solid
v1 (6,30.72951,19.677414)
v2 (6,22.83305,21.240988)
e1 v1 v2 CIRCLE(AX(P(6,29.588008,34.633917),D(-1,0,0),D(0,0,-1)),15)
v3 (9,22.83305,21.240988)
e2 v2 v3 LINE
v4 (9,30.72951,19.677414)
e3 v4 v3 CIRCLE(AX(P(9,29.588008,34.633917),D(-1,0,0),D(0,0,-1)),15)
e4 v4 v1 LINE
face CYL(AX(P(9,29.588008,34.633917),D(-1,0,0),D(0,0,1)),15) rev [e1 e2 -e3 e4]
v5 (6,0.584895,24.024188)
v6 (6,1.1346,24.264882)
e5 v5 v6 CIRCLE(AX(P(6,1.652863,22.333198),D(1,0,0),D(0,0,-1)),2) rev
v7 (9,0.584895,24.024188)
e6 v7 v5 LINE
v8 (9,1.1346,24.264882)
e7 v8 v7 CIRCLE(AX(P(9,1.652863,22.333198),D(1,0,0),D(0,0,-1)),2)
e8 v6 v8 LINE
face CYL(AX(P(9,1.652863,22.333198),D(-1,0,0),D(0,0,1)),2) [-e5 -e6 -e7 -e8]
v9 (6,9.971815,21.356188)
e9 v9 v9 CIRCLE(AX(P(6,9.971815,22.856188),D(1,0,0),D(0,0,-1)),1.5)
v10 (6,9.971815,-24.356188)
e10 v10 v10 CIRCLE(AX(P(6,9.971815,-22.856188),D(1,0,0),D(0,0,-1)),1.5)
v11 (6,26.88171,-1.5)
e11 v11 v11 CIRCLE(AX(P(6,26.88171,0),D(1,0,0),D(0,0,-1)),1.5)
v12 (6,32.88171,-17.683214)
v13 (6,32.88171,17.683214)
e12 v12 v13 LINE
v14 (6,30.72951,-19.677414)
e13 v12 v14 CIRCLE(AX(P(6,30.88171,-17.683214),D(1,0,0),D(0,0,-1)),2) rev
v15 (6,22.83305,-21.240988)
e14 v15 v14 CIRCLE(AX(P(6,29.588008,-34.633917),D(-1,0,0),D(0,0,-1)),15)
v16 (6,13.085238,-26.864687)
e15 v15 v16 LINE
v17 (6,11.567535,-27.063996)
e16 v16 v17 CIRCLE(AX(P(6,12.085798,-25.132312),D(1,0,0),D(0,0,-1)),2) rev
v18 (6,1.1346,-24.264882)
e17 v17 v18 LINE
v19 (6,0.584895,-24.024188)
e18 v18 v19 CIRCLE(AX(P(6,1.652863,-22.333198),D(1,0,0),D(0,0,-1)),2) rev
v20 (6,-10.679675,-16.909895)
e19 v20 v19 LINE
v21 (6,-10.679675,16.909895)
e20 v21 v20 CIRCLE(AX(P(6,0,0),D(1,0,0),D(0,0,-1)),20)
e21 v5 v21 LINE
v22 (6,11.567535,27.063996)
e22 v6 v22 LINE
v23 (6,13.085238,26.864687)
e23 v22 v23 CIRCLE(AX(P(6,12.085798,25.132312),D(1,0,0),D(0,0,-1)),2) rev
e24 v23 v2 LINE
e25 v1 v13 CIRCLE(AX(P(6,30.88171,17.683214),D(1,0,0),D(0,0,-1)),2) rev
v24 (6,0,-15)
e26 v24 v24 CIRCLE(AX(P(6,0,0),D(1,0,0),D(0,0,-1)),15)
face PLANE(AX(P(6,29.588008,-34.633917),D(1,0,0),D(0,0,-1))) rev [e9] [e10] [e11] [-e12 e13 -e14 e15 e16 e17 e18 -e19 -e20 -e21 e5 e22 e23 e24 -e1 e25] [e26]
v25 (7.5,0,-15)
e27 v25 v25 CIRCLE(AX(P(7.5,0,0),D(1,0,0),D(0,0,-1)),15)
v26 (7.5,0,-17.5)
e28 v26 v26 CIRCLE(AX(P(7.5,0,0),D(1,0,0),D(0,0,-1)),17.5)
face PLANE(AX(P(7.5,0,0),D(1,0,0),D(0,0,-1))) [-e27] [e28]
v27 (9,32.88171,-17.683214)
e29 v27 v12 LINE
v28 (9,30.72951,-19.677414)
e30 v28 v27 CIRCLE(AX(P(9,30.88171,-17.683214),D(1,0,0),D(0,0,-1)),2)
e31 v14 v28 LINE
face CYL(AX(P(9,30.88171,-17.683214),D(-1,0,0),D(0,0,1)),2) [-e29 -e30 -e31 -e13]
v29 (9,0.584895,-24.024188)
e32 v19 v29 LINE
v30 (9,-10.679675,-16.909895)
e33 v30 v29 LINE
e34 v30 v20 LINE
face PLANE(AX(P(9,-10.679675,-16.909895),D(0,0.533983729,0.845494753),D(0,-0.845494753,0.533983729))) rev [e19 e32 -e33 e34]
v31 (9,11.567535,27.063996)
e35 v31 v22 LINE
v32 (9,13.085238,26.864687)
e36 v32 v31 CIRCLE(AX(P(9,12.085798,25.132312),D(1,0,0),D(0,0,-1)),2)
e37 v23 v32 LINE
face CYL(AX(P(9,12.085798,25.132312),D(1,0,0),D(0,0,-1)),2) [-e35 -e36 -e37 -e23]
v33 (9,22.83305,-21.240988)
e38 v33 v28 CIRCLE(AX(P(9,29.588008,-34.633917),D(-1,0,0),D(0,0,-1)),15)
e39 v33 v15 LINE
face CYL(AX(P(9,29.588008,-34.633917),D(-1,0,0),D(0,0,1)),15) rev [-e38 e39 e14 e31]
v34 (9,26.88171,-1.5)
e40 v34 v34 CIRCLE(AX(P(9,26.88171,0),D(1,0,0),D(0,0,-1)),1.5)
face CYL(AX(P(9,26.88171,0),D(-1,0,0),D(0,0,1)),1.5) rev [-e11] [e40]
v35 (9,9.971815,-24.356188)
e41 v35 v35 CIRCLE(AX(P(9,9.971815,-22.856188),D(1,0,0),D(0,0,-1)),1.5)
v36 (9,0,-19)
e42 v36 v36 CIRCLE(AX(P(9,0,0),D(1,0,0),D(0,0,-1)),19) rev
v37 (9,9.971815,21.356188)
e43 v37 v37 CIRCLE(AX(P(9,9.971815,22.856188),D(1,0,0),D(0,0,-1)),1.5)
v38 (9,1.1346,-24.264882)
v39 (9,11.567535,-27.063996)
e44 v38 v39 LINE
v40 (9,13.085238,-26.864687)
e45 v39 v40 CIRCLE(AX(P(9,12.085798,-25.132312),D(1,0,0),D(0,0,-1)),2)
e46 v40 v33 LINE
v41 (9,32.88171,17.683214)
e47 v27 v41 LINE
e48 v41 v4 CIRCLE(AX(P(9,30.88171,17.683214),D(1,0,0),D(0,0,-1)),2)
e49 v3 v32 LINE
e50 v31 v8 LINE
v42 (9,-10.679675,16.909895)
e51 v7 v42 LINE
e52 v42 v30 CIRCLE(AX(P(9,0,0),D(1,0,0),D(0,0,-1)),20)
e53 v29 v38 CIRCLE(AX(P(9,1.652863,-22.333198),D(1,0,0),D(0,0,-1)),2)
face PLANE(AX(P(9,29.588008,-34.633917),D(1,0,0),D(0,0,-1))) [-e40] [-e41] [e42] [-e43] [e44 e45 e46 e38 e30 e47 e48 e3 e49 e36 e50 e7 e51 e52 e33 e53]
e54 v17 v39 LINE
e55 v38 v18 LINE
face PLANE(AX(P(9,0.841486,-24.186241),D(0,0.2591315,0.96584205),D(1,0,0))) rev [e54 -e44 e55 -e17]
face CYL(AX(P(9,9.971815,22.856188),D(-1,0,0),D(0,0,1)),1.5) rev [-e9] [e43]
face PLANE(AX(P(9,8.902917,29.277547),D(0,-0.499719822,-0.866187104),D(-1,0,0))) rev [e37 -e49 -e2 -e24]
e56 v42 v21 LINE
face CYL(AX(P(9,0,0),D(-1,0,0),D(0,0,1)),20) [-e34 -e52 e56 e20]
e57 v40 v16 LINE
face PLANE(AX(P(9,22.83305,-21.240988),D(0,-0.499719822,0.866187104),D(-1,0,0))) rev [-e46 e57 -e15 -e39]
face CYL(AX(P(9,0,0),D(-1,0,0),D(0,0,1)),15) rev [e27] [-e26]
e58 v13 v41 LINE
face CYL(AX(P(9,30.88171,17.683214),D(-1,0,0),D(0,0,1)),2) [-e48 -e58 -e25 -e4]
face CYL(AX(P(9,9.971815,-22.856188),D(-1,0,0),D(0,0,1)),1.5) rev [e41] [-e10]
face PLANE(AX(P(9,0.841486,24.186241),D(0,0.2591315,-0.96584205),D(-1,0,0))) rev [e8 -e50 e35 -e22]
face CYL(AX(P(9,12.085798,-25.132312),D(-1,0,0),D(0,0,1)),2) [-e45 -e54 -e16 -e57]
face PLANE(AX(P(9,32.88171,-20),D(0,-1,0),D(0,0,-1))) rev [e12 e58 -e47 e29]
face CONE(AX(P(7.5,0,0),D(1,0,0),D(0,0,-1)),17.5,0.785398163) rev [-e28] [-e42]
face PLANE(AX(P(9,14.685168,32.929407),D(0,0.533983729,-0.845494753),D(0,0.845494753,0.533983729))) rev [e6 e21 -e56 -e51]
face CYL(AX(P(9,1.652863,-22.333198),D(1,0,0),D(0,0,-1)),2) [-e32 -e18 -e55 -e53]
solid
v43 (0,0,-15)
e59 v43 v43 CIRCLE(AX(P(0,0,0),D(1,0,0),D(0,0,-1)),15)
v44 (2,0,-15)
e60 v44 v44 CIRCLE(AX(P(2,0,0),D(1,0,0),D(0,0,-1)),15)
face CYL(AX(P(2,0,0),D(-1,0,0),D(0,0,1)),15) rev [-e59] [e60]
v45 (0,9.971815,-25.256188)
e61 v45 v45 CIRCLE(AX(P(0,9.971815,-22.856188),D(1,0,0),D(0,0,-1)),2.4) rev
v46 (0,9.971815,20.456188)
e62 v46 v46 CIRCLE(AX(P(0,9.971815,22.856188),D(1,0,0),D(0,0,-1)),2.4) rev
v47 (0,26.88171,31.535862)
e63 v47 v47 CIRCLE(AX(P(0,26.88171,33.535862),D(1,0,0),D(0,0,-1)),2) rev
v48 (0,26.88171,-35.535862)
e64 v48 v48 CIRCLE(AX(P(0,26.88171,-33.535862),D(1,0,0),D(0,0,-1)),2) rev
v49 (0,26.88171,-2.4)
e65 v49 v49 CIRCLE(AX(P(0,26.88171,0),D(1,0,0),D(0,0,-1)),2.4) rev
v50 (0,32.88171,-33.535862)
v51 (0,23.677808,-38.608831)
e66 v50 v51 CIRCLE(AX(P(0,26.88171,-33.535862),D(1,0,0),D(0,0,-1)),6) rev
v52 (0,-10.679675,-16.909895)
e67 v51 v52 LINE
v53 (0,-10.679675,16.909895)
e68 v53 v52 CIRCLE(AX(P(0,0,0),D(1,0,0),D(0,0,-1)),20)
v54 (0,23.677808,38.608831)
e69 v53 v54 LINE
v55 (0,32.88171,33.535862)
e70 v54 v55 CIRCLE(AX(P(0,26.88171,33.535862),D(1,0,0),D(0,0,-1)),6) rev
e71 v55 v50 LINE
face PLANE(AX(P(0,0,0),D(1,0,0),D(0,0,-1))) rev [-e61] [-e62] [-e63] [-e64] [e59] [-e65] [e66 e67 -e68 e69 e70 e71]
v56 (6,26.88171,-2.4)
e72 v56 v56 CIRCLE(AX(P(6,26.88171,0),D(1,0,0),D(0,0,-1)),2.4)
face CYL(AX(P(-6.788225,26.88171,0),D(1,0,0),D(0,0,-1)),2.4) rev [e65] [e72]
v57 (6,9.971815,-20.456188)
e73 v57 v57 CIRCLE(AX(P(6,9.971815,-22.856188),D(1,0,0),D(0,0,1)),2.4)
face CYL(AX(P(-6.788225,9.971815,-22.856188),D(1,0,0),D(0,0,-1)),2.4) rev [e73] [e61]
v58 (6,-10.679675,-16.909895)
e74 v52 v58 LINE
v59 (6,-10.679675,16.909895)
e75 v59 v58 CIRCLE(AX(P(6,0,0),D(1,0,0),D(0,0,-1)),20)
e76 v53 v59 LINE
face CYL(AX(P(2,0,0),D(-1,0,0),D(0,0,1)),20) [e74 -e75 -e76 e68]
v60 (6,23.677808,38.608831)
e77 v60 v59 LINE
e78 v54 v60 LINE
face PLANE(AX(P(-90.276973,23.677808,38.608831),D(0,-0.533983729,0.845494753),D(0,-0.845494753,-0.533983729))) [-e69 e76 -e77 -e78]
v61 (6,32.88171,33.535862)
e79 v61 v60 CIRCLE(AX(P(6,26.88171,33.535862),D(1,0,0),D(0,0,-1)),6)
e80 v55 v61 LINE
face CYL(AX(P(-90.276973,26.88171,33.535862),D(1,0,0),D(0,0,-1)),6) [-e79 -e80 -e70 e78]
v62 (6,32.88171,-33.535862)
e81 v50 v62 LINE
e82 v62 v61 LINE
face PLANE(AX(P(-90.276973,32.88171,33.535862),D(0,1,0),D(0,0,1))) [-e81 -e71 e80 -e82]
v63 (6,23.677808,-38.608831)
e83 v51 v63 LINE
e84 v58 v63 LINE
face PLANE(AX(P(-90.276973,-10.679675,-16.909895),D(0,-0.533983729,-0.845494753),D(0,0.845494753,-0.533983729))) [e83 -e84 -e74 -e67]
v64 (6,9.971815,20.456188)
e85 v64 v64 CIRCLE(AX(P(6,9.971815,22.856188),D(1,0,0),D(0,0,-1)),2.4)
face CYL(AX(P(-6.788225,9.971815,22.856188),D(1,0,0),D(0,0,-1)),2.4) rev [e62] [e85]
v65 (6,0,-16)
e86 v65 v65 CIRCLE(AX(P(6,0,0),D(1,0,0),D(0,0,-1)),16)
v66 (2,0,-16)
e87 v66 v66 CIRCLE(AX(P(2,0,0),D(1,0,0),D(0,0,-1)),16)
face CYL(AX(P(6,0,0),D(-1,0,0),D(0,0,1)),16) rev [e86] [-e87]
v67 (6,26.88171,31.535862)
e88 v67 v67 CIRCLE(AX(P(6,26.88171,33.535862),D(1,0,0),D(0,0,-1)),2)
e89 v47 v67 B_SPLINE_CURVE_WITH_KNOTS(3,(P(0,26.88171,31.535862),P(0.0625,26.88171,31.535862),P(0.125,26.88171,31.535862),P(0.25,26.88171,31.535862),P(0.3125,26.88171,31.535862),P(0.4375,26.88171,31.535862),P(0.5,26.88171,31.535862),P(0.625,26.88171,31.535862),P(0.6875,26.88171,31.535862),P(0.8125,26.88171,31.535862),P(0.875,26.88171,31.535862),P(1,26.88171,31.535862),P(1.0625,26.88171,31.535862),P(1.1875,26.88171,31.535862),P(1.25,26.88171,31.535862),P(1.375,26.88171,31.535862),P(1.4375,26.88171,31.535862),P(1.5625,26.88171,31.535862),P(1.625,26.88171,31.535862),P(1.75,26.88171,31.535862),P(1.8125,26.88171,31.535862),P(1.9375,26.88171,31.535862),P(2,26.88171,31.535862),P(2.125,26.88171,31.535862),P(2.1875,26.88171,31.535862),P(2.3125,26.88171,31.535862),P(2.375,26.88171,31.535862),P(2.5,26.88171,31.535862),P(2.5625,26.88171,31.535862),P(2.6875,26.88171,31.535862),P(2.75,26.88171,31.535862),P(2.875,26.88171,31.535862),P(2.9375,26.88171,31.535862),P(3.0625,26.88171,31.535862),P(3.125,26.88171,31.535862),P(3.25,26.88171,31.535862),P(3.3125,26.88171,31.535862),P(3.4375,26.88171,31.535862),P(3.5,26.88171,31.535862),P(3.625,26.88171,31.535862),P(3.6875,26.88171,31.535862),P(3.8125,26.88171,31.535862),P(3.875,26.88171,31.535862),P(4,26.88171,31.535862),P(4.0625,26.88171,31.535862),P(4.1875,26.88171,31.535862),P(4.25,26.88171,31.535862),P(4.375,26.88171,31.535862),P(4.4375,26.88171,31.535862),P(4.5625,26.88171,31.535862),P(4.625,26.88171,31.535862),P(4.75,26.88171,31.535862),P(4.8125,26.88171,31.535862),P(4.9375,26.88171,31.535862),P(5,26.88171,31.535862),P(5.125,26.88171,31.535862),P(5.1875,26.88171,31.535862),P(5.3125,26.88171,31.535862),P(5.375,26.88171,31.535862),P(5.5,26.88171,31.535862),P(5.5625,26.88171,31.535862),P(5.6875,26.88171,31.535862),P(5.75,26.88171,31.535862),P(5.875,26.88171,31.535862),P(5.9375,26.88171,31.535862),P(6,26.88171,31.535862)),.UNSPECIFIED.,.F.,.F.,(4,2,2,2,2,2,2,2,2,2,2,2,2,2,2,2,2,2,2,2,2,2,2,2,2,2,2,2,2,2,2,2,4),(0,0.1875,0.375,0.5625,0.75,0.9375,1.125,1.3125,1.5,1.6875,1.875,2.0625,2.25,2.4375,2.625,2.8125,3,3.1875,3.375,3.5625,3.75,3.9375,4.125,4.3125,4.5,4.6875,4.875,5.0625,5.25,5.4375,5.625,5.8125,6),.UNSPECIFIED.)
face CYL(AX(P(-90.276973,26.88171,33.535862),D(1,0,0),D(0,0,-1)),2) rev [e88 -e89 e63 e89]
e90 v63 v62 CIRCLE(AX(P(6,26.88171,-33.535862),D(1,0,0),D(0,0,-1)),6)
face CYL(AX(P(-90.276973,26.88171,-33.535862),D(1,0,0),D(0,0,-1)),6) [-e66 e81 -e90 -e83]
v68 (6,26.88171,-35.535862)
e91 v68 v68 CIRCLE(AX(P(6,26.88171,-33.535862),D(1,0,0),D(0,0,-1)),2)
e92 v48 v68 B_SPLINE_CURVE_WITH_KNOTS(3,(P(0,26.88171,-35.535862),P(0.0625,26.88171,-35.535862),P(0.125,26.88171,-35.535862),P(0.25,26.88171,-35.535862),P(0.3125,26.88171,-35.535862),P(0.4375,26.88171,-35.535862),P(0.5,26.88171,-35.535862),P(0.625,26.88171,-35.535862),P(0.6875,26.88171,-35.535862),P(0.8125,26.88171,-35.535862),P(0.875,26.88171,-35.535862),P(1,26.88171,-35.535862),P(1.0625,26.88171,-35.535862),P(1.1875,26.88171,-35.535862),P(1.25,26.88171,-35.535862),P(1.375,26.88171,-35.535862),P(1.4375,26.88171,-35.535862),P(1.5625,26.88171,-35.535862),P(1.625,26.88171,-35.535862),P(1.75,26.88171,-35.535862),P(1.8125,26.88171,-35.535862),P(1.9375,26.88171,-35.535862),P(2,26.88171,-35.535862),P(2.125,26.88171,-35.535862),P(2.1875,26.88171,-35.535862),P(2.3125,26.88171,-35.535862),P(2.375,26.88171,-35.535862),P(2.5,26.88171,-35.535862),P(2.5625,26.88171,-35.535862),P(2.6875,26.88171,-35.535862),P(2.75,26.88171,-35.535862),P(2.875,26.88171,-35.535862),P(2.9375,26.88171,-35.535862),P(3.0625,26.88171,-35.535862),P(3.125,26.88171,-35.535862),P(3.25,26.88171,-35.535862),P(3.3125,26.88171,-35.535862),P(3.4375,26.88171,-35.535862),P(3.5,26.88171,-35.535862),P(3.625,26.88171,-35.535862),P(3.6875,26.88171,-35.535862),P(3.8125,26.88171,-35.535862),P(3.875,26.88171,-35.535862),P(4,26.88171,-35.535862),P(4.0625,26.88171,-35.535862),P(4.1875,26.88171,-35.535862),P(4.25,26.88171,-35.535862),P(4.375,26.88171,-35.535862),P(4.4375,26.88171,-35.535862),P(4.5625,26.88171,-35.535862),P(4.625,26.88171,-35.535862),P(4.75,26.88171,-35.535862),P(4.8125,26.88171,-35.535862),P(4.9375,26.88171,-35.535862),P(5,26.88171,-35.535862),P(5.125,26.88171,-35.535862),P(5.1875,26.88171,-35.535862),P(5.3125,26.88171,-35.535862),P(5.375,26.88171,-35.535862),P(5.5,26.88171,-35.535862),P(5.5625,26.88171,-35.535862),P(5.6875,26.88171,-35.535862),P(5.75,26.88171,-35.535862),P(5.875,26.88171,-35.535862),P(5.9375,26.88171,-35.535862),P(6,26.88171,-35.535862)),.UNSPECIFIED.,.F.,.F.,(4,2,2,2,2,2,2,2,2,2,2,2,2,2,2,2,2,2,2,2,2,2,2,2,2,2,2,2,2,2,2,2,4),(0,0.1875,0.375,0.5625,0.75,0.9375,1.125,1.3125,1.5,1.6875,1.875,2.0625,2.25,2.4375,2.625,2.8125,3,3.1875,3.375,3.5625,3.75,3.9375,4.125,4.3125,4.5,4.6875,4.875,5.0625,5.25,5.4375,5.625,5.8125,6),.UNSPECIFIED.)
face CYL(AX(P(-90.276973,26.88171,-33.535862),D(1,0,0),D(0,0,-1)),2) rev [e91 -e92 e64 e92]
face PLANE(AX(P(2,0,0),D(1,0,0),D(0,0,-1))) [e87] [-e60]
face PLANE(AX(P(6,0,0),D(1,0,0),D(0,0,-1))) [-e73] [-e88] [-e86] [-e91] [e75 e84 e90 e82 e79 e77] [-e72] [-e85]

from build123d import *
from OCP.BRepFilletAPI import BRepFilletAPI_MakeChamfer

# Parameters (mm, degrees)
SKETCH1_R           = 20
SKETCH1_R_2         = 15
BOSS_EXTRUDE1_DEPTH = 2
SKETCH2_R           = 20
SKETCH2_R_2         = 16
BOSS_EXTRUDE2_DEPTH = 4
BOSS_EXTRUDE3_START = -6
SKETCH3_R           = 2
BOSS_EXTRUDE3_DEPTH = 6
SKETCH4_R           = 2.4
CUT_EXTRUDE1_DEPTH  = 6
SKETCH5_R           = 15
SKETCH5_R_2         = 1.5
BOSS_EXTRUDE4_DEPTH = 3
FILLET1_R           = 2
CUT_EXTRUDE2_START  = -1.5
SKETCH6_R           = 17.5
SKETCH6_R_2         = 15
CUT_EXTRUDE2_DEPTH  = 1.5
CHAMFER1_SIZE       = 1.5
CHAMFER2_START      = 6
CHAMFER2_DEPTH      = 3
CHAMFER2_2_DEPTH    = 3
CHAMFER3_SIZE       = 4
CHAMFER3_SIZE2      = 9.534572009
FILLET2_R           = 2


with BuildPart() as part:
    # Sketch1 → Boss-Extrude1 (new body)
    with BuildSketch(Plane(origin=(0, 0, 0), x_dir=(0, 0, -1), z_dir=(1, 0, 0))):
        Circle(SKETCH1_R)
        Circle(SKETCH1_R_2, mode=Mode.SUBTRACT)
    extrude(amount=BOSS_EXTRUDE1_DEPTH)

    # Sketch2 → Boss-Extrude2 (add)
    with BuildSketch(Plane(origin=(2, 0, 0), x_dir=(0, 0, -1), z_dir=(1, 0, 0))):
        Circle(SKETCH2_R)
        Circle(SKETCH2_R_2, mode=Mode.SUBTRACT)
    extrude(amount=BOSS_EXTRUDE2_DEPTH)

    # Sketch3 → Boss-Extrude3 (add)
    with BuildSketch(Plane(origin=(6, 0, 0), x_dir=(0, 0, -1), z_dir=(1, 0, 0)).offset(BOSS_EXTRUDE3_START)):
        with BuildLine():
            Line((-38.608830959, 23.677807584), (-16.909895057, -10.679674581))
            ThreePointArc((-16.909895057, -10.679674581), (0, 20), (16.909895057, -10.679674581))
            Line((16.909895057, -10.679674581), (38.608830959, 23.677807584))
            ThreePointArc((38.608830959, 23.677807584), (38.790546744, 29.777964933), (33.535862442, 32.881709959))
            Line((33.535862442, 32.881709959), (-33.535862442, 32.881709959))
            ThreePointArc((-33.535862442, 32.881709959), (-38.790546744, 29.777964933), (-38.608830959, 23.677807584))
        make_face()
        with Locations((-33.535862442, 26.881709959)):
            Circle(SKETCH3_R, mode=Mode.SUBTRACT)
        with Locations((33.535862442, 26.881709959)):
            Circle(SKETCH3_R, mode=Mode.SUBTRACT)
    extrude(amount=BOSS_EXTRUDE3_DEPTH)

    # Sketch4 → Cut-Extrude1 (cut)
    with BuildSketch(Plane(origin=(6, 0, 0), x_dir=(0, 0, -1), z_dir=(1, 0, 0))):
        with Locations((-22.856187861, 9.971814902)):
            Circle(SKETCH4_R)
        with Locations((22.856187861, 9.971814902)):
            Circle(SKETCH4_R)
        with Locations((0, 26.881709959)):
            Circle(SKETCH4_R)
    extrude(amount=-CUT_EXTRUDE1_DEPTH, mode=Mode.SUBTRACT)


with BuildPart() as body_2:
    # Sketch5 → Boss-Extrude4 (new body)
    with BuildSketch(Plane(origin=(6, 0, 0), x_dir=(0, 0, -1), z_dir=(1, 0, 0))):
        with BuildLine():
            Line((16.909895057, -10.679674581), (32.929406929, 14.685168005))
            ThreePointArc((32.929406929, 14.685168005), (22.406301367, 20.899773925), (20, 32.881709959))
            Line((20, 32.881709959), (-20, 32.881709959))
            ThreePointArc((-20, 32.881709959), (-22.406301367, 20.899773925), (-32.929406929, 14.685168005))
            Line((-32.929406929, 14.685168005), (-16.909895057, -10.679674581))
            ThreePointArc((-16.909895057, -10.679674581), (0, -20), (16.909895057, -10.679674581))
        make_face()
        Circle(SKETCH5_R, mode=Mode.SUBTRACT)
        with Locations((-22.856187861, 9.971814902)):
            Circle(SKETCH5_R_2, mode=Mode.SUBTRACT)
        with Locations((0, 26.881709959)):
            Circle(SKETCH5_R_2, mode=Mode.SUBTRACT)
        with Locations((22.856187861, 9.971814902)):
            Circle(SKETCH5_R_2, mode=Mode.SUBTRACT)
    extrude(amount=BOSS_EXTRUDE4_DEPTH)

    # Fillet1
    fillet1_edges = [body_2.edges().sort_by_distance(p)[0] for p in [
        (7.5, 32.881709959, 20),
        (7.5, 32.881709959, -20),
    ]]
    fillet(fillet1_edges, radius=FILLET1_R)

    # Sketch6 → Cut-Extrude2 (cut)
    with BuildSketch(Plane(origin=(9, 0, 0), x_dir=(0, 0, -1), z_dir=(1, 0, 0)).offset(CUT_EXTRUDE2_START)):
        Circle(SKETCH6_R)
        Circle(SKETCH6_R_2, mode=Mode.SUBTRACT)
    extrude(amount=CUT_EXTRUDE2_DEPTH, mode=Mode.SUBTRACT)

    # Chamfer1
    chamfer1_edges = [body_2.edges().sort_by_distance(p)[0] for p in [
        (9, 0, 17.5),
    ]]
    chamfer(chamfer1_edges, length=CHAMFER1_SIZE - 0.0001)  # a hair under: the kernel refuses the full size

    # Chamfer2: read off the stored shape, not the designer's step
    # Chamfer2 outline → Chamfer2 (cut)
    with BuildSketch(Plane.YZ.offset(CHAMFER2_START)):
        with BuildLine():
            ThreePointArc((14.685168005, -32.929406929), (16.820809532, -26.759995627), (21.374989761, -22.082171028))
            Line((21.374989761, -22.082171028), (8.902916658, -29.277547321))
            Line((8.902916658, -29.277547321), (14.685168005, -32.929406929))
        make_face()
        with BuildLine():
            Line((14.685168005, 32.929406929), (8.902916658, 29.277547321))
            Line((8.902916658, 29.277547321), (21.374989761, 22.082171028))
            ThreePointArc((21.374989761, 22.082171028), (16.820809532, 26.759995627), (14.685168005, 32.929406929))
        make_face()
    extrude(amount=CHAMFER2_DEPTH, mode=Mode.SUBTRACT)

    # Chamfer2 2 outline → Chamfer2 2 (add)
    with BuildSketch(Plane.YZ.offset(CHAMFER2_START)):
        with BuildLine():
            Line((21.374989761, -22.082171028), (22.833050026, -21.240988317))
            ThreePointArc((22.833050026, -21.240988317), (22.09221084, -21.641110503), (21.374989761, -22.082171028))
        make_face()
        with BuildLine():
            Line((22.833050026, 21.240988317), (21.374989761, 22.082171028))
            ThreePointArc((21.374989761, 22.082171028), (22.09221084, 21.641110503), (22.833050026, 21.240988317))
        make_face()
    extrude(amount=CHAMFER2_2_DEPTH)

    # Chamfer3: one chamfer whose edges measure the first distance from different faces: ONE call of the kernel's chamfer builder (chamfer() names one face for all edges)
    chamfer3_edges_1 = [body_2.edges().sort_by_distance(p)[0] for p in [
        (7.5, 8.902916658, -29.277547321),
    ]]
    chamfer3_side_1 = [body_2.faces().sort_by_distance(p)[0] for p in [
        (7.5, 15.13895321, -25.679859174),
    ]]
    chamfer3_edges_2 = [body_2.edges().sort_by_distance(p)[0] for p in [
        (7.5, 8.902916658, 29.277547321),
    ]]
    chamfer3_side_2 = [body_2.faces().sort_by_distance(p)[0] for p in [
        (7.5, 15.138953209, 25.679859174),
    ]]
    chamfer3 = BRepFilletAPI_MakeChamfer(body_2.part.solid().wrapped)
    for e in chamfer3_edges_1:
        chamfer3.Add(CHAMFER3_SIZE, CHAMFER3_SIZE2, e.wrapped, chamfer3_side_1[0].wrapped)  # the first distance lies on this face
    for e in chamfer3_edges_2:
        chamfer3.Add(CHAMFER3_SIZE, CHAMFER3_SIZE2, e.wrapped, chamfer3_side_2[0].wrapped)  # the first distance lies on this face
    add(Compound.cast(chamfer3.Shape()), mode=Mode.REPLACE)

    # Fillet2
    fillet2_edges = [body_2.edges().sort_by_distance(p)[0] for p in [
        (7.5, 0.841486054, -24.186241005),
        (7.5, 12.367665074, -27.278668032),
        (7.5, 0.841486054, 24.186241005),
        (7.5, 12.367665074, 27.278668032),
    ]]
    fillet(fillet2_edges, radius=FILLET2_R)


solid = Compound([part.part, body_2.part])
